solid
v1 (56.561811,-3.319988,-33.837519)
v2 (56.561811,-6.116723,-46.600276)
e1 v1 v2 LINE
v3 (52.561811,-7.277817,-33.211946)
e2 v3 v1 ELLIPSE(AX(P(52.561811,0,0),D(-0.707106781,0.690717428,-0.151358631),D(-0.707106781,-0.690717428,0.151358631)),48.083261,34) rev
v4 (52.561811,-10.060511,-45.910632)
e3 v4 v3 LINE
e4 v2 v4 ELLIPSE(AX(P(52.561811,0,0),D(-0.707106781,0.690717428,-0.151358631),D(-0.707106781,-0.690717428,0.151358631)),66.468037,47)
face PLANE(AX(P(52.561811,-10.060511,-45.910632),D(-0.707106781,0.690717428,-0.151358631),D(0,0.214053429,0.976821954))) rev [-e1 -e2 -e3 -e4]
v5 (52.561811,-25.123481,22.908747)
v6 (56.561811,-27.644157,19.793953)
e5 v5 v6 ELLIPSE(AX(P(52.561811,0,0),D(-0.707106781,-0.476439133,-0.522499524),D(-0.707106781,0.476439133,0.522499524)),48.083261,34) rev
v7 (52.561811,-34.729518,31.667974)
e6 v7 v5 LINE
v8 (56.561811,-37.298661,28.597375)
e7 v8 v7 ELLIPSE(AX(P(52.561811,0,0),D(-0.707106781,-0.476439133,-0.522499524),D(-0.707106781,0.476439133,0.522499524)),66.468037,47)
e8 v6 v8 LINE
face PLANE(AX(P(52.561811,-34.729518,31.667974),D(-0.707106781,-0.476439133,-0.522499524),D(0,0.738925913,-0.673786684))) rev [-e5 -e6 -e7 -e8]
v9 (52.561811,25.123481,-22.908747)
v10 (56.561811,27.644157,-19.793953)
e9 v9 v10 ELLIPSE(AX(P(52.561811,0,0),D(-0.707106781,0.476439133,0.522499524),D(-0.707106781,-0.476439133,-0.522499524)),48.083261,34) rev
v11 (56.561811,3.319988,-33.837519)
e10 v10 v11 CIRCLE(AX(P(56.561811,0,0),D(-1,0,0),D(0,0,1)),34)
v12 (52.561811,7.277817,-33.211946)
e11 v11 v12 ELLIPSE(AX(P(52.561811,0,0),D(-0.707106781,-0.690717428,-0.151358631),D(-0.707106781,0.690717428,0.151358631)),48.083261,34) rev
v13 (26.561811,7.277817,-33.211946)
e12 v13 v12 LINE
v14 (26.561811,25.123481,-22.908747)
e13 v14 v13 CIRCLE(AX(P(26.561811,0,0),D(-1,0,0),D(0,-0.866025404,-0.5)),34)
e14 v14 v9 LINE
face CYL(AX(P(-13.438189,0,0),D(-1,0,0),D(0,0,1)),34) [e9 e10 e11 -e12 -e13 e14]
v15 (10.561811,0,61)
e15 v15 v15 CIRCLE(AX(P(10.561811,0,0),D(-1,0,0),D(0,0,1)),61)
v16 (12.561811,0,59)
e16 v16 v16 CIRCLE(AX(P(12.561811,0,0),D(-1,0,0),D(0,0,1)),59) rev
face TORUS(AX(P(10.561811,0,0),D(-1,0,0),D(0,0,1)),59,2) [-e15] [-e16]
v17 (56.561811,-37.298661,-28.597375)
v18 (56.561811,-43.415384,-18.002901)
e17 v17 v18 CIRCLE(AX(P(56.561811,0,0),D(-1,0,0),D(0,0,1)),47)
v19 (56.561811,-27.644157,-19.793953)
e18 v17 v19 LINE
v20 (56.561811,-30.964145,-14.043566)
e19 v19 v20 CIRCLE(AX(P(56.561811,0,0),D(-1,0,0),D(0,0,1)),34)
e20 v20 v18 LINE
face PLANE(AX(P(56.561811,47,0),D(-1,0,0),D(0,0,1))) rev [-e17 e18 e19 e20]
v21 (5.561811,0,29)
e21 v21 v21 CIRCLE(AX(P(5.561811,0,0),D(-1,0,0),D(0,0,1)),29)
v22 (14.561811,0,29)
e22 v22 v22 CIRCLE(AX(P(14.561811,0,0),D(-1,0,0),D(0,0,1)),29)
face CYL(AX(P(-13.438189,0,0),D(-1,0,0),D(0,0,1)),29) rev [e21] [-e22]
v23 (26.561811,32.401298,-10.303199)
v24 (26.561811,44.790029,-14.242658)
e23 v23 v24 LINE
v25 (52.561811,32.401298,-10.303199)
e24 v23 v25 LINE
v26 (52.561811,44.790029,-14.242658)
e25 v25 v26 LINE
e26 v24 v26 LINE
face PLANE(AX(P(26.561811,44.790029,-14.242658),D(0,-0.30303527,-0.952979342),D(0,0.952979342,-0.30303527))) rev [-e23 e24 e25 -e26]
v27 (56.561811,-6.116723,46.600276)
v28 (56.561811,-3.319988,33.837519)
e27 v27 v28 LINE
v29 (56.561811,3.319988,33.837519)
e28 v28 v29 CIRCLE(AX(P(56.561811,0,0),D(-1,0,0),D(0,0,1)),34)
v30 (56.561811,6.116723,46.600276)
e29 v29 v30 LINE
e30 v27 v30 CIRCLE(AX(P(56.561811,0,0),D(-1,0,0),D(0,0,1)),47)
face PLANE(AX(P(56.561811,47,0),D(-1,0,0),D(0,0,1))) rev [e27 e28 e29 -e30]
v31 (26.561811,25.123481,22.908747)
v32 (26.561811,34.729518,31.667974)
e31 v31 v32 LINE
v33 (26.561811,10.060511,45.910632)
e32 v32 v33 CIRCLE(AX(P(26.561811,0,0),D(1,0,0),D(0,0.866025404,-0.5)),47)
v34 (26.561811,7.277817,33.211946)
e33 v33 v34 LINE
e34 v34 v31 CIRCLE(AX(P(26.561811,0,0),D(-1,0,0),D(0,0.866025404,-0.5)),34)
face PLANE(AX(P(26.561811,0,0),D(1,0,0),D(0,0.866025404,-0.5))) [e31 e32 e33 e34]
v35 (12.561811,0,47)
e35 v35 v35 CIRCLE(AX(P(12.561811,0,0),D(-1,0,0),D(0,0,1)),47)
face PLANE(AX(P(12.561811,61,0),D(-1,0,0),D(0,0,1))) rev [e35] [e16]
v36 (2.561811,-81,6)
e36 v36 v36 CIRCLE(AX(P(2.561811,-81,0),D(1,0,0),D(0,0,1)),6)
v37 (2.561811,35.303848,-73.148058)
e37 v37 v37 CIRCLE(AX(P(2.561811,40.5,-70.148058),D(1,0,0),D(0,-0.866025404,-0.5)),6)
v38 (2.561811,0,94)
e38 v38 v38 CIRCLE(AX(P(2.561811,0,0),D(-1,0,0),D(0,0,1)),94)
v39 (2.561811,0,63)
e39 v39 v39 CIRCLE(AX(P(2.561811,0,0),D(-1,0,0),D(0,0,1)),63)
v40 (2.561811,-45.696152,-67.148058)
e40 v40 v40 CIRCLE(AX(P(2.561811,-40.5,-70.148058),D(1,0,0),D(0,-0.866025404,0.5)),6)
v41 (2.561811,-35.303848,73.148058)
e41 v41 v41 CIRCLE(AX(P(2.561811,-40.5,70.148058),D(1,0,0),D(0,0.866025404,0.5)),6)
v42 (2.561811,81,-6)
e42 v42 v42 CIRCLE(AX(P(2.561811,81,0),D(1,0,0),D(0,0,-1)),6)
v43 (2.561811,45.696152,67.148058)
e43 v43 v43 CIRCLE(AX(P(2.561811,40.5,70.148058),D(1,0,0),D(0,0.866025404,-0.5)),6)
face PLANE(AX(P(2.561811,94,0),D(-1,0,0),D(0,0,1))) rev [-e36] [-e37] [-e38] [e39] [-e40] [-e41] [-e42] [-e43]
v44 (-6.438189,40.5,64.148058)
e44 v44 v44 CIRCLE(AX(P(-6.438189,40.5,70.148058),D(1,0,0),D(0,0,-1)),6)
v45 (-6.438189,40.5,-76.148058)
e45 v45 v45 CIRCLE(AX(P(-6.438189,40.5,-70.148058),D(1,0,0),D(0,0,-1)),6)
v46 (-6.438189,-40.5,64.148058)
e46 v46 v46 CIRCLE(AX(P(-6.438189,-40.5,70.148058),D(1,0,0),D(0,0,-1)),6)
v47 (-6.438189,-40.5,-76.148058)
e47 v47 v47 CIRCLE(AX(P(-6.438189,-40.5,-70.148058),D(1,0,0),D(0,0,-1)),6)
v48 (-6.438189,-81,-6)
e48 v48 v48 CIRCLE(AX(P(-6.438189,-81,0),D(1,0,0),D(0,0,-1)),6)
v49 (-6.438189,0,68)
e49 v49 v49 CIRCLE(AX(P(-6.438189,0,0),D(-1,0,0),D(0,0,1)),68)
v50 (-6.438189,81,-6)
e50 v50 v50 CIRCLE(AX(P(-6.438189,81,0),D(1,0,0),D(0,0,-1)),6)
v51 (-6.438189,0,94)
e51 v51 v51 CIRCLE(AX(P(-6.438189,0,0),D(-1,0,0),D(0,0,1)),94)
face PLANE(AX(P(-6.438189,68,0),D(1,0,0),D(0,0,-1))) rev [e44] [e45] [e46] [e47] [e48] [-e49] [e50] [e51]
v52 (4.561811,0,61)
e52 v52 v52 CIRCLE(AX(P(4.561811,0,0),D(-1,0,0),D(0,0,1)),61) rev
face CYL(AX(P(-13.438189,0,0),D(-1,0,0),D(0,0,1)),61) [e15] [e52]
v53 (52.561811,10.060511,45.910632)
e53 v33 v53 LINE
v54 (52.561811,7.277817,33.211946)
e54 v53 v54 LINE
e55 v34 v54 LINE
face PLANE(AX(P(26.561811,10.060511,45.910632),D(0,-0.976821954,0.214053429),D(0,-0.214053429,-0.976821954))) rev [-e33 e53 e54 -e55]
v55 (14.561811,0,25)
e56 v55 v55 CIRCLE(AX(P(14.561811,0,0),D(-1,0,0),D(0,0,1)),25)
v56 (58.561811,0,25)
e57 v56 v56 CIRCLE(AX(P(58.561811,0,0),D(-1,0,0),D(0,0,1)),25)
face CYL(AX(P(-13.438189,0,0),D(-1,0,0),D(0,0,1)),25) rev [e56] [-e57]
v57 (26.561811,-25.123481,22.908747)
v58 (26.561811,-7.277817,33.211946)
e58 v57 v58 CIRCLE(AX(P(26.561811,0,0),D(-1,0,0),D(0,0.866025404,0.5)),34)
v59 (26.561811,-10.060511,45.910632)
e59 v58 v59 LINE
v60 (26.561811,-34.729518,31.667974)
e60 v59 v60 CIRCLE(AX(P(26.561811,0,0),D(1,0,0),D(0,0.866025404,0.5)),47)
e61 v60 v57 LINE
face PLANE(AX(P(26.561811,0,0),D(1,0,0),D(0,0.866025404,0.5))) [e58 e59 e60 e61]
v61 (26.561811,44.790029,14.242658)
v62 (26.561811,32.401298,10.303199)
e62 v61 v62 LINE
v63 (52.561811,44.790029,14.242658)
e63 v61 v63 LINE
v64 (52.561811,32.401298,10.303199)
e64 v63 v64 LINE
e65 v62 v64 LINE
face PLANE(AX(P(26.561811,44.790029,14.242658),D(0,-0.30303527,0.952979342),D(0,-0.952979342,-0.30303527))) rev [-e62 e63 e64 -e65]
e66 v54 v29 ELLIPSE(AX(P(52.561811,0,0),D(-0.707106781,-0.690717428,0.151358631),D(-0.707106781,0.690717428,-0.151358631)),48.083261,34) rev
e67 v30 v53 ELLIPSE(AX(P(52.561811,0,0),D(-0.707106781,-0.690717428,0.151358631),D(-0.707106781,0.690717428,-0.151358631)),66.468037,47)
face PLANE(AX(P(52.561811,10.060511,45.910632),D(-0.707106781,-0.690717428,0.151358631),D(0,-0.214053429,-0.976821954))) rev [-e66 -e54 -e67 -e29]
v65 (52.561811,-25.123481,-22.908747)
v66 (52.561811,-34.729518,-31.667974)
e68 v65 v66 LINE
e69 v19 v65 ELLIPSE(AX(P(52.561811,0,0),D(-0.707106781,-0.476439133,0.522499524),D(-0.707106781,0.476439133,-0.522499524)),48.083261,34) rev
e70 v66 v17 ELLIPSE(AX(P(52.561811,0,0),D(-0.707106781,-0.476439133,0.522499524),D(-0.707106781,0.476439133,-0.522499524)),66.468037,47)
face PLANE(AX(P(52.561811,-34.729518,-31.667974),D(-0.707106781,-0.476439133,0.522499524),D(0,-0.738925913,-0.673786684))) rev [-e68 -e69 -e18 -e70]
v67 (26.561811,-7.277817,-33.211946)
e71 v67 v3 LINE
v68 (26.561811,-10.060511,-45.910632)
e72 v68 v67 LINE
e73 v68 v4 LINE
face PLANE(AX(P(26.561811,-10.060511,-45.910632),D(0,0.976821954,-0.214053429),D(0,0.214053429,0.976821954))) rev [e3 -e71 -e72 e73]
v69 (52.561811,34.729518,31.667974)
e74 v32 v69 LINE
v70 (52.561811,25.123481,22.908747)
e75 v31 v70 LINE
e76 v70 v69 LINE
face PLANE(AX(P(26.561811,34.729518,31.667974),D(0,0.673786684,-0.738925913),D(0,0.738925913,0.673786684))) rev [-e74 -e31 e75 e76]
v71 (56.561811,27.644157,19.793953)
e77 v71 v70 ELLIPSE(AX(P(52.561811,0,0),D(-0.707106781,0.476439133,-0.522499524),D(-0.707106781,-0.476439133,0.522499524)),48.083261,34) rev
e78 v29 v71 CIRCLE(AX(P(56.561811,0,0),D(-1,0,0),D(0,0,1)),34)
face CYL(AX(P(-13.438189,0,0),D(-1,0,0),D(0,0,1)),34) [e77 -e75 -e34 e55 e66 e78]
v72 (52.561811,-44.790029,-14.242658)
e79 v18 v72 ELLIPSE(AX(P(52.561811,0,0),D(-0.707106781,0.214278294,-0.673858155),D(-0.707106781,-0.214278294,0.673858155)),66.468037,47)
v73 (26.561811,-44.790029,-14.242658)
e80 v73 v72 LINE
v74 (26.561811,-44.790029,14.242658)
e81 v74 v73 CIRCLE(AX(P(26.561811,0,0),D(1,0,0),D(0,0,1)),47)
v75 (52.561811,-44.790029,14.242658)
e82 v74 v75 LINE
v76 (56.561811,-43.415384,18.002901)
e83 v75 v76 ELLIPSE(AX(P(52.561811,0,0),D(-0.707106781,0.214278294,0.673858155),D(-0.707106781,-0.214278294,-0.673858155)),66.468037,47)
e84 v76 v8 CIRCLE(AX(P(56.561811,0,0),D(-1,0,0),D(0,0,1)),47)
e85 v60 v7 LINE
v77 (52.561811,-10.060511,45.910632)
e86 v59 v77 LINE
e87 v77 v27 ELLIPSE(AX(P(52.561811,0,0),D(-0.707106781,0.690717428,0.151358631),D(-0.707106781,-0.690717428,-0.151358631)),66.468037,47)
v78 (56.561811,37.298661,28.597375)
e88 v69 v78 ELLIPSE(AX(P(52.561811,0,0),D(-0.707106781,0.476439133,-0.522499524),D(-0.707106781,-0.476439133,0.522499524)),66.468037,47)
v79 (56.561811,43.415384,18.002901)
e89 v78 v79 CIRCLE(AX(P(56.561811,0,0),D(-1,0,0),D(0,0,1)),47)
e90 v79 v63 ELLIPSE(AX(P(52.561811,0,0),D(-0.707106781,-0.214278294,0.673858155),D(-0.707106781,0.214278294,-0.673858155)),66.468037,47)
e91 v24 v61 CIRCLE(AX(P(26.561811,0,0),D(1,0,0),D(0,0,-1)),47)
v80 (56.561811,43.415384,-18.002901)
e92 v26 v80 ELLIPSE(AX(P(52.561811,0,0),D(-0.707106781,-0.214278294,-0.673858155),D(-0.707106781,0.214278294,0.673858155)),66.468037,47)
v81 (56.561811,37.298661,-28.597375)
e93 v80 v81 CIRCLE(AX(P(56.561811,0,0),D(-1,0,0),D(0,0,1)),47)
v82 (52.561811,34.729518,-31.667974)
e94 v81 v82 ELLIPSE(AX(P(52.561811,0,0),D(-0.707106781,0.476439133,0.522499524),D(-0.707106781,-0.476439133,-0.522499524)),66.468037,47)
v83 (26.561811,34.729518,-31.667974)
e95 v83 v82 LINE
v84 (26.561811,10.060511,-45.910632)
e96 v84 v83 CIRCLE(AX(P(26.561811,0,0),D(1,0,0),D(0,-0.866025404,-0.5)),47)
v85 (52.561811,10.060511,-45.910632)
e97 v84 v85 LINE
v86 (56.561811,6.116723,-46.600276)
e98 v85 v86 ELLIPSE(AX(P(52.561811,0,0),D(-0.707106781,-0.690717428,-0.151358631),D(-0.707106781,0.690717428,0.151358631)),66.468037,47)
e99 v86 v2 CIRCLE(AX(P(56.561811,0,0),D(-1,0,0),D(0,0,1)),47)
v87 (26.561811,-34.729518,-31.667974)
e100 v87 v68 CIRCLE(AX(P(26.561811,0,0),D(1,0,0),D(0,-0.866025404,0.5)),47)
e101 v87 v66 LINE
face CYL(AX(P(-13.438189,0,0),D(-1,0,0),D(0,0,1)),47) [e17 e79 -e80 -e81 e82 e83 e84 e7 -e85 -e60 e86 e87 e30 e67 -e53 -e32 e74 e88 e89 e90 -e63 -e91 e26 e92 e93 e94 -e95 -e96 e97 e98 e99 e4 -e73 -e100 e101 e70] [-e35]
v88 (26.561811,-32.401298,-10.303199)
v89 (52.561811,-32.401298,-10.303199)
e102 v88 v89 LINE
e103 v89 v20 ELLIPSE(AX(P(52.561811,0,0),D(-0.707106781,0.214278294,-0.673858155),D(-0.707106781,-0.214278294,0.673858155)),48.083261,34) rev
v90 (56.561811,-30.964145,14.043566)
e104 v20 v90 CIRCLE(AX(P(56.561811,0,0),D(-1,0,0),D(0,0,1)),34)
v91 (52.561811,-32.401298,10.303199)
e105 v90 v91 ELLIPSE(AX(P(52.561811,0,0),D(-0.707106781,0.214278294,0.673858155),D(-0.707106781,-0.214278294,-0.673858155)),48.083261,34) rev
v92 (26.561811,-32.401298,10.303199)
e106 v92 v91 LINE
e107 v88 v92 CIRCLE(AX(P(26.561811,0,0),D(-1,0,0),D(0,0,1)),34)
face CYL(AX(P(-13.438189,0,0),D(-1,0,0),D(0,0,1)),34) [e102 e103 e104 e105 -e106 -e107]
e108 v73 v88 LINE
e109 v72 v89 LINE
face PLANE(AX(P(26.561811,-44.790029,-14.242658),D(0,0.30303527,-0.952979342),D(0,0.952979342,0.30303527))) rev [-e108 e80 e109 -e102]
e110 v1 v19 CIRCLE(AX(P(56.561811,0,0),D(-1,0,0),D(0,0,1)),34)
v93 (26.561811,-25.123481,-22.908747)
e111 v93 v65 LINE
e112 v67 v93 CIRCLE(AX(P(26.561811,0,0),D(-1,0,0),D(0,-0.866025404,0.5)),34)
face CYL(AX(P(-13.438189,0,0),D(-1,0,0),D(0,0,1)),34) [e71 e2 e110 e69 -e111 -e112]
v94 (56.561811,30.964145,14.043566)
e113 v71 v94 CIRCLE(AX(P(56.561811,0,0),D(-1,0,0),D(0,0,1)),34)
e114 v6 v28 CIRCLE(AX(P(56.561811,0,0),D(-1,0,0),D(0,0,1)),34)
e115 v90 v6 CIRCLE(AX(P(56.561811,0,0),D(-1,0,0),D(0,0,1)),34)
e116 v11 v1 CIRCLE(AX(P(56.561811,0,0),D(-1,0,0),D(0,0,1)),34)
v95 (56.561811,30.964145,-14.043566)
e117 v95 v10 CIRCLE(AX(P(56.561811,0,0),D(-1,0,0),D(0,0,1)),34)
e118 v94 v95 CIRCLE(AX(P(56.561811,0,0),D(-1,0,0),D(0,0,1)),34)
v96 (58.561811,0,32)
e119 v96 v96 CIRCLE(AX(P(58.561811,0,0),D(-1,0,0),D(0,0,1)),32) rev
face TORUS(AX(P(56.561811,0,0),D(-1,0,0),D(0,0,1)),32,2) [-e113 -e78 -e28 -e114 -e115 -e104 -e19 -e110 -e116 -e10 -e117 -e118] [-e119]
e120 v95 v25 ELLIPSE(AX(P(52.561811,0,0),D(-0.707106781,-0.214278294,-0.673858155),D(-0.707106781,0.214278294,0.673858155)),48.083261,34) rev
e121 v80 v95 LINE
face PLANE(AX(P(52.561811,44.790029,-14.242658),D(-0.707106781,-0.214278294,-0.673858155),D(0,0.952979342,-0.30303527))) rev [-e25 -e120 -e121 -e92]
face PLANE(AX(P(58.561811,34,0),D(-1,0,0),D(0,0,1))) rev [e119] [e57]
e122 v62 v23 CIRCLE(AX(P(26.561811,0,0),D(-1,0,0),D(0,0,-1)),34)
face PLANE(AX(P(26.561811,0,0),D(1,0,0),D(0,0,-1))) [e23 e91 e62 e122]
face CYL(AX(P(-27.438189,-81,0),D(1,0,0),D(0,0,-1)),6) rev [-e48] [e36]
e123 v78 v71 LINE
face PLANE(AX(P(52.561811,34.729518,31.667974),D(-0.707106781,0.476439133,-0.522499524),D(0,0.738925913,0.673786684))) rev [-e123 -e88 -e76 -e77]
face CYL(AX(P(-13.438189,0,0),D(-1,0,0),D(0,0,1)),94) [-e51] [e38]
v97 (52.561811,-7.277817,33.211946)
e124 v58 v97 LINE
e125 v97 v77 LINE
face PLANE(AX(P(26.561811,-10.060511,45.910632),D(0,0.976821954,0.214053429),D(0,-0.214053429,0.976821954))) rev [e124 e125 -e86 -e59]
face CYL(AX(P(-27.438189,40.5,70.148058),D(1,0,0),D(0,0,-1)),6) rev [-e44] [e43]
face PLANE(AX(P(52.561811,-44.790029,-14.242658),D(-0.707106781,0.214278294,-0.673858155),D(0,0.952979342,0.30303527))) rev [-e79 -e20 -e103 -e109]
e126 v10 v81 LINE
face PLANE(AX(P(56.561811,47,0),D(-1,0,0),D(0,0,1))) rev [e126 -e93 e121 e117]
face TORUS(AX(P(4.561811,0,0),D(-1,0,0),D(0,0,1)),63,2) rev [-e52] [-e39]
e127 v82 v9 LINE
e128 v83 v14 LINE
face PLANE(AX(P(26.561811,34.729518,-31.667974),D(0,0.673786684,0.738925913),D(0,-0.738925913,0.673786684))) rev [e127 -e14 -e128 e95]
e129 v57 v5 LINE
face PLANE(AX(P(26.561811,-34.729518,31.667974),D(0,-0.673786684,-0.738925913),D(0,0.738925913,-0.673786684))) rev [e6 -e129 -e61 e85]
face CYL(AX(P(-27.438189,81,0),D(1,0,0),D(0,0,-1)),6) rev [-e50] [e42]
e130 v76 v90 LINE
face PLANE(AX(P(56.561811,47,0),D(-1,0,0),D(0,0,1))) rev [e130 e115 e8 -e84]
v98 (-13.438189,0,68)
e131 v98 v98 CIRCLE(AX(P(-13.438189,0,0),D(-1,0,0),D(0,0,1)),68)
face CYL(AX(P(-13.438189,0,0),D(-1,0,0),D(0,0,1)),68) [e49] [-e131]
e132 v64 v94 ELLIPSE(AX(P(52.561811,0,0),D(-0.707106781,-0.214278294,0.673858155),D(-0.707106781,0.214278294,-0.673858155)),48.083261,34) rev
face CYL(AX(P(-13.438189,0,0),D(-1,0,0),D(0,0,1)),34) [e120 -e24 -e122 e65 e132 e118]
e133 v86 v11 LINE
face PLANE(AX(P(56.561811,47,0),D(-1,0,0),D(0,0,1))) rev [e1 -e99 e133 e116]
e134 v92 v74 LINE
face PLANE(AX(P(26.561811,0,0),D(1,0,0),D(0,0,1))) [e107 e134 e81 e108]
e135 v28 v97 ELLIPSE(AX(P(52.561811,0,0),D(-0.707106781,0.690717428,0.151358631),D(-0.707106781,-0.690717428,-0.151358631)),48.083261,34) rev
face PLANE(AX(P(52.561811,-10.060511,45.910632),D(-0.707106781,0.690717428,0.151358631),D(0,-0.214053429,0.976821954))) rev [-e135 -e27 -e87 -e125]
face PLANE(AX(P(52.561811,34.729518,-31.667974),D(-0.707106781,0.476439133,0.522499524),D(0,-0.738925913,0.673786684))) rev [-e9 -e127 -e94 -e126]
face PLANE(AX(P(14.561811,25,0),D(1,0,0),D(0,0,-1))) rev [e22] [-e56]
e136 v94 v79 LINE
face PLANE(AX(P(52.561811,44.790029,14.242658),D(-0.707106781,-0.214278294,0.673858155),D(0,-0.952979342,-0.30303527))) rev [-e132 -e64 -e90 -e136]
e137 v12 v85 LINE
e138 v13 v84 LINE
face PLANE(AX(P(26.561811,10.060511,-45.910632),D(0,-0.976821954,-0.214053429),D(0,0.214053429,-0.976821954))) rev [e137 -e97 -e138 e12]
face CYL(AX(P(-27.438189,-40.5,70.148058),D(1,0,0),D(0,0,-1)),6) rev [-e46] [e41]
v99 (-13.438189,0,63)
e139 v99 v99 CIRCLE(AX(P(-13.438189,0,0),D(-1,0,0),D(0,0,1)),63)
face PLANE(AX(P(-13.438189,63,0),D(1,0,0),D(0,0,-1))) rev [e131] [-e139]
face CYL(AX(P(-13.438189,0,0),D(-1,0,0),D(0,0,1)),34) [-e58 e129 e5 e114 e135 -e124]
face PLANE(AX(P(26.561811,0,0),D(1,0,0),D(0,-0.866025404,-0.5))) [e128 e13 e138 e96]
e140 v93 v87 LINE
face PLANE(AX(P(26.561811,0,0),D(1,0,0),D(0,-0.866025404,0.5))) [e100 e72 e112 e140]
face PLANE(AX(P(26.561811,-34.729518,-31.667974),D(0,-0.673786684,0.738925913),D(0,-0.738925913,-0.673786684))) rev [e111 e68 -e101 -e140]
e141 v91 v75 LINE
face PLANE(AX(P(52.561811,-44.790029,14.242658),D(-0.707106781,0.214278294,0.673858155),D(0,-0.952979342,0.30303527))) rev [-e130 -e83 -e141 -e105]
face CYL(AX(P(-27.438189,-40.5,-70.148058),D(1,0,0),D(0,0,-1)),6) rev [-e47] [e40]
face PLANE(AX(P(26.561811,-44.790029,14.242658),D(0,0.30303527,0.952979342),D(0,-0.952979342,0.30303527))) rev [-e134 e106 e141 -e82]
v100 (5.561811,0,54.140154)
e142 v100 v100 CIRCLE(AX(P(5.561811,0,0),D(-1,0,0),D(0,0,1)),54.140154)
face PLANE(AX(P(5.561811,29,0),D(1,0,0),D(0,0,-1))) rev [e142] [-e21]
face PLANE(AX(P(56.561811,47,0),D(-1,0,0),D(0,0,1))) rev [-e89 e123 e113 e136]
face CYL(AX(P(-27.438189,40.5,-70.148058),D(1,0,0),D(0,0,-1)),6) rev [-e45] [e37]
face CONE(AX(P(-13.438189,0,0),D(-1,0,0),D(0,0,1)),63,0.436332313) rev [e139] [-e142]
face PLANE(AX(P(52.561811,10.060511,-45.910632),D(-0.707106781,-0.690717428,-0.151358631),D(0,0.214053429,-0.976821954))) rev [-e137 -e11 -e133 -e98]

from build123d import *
from build123d.topology import SkipClean

# Parameters (mm, degrees)
CUT_EXTRUDE1_DEPTH = 15
SKETCH3_R          = 3.0000000000000018
CUT_EXTRUDE2_DEPTH = 15
CIRPATTERN2_COUNT  = 6
FILLET1_R          = 1
CHAMFER1_SIZE      = 2
SCALE1_SCALE       = 2


# Some blends are built 0.0001 mm under size
with BuildPart() as part:
    # Sketch1 → Revolve1 (revolve)
    with BuildSketch(Plane.XY, mode=Mode.PRIVATE) as revolve1_sk:
        Polygon((0, 31.5), (0, 34), (3.5, 34), (3.5, 47), (8, 47), (8.000000000000004, 30.499999999999993), (13.000000000000005, 30.499999999999993), (13.000000000000005, 23.499999999999996), (35, 23.49999999999999), (35, 17.000000000000004), (36.00000000000001, 17.000000000000007), (36.00000000000001, 12.500000000000007), (14.000000000000005, 12.5), (14.000000000000005, 14.5), (9.500000000000005, 14.500000000000002), (9.500000000000005, 27.07007724752754), align=None)
    revolve(revolve1_sk.sketch.rotate(Axis((0, 0, 0), (1, 0, 0)), 90), axis=Axis((0, 0, 0), (1, 0, 0)))

    # Sketch2 → Cut-Extrude1 (cut)
    with BuildSketch(Plane(origin=(35, 0, 0), x_dir=(0, 0, -1), z_dir=(1, 0, 0))):
        with BuildLine():
            Line((-7.121328836370207, 22.395014525654634), (-5.151599583757172, 16.200648805792717))
            ThreePointArc((-5.151599583757172, 16.200648805792717), (-6.51e-15, 17), (5.151599583757166, 16.200648805792717))
            Line((5.151599583757166, 16.200648805792717), (7.121328836370199, 22.395014525654634))
            ThreePointArc((7.121328836370199, 22.395014525654634), (-3.78e-15, 23.499999999999996), (-7.121328836370207, 22.395014525654634))
        make_face()
    cut_extrude1 = extrude(amount=-CUT_EXTRUDE1_DEPTH, mode=Mode.SUBTRACT)

    # Sketch3 → Cut-Extrude2 (cut)
    with BuildSketch(Plane(origin=(8.000000000000002, 0, 0), x_dir=(0, 0, -1), z_dir=(1, 0, 0))):
        with Locations((0, 40.5)):
            Circle(SKETCH3_R)
    cut_extrude2 = extrude(amount=-CUT_EXTRUDE2_DEPTH, mode=Mode.SUBTRACT)

    # CirPattern2: Cut-Extrude1, Cut-Extrude2 ×6 about axis
    with SkipClean():  # the faces are left unmerged after this step: merging them gives an invalid solid
        cirpattern2_axis = Axis((0, -8.4e-16, -2.024e-14), (1, 0, 0))
        add([cut_extrude1.rotate(cirpattern2_axis, i * 360 / CIRPATTERN2_COUNT) for i in range(1, CIRPATTERN2_COUNT)], mode=Mode.SUBTRACT)
        add([cut_extrude2.rotate(cirpattern2_axis, i * 360 / CIRPATTERN2_COUNT) for i in range(1, CIRPATTERN2_COUNT)], mode=Mode.SUBTRACT)

    # Fillet1
    fillet1_edges = [part.edges().sort_by_distance(p)[0] for p in [
        (36.00000000000001, -3.97e-15, -17.000000000000007),
        (13.000000000000005, -7.12e-15, -30.499999999999993),
        (8.000000000000004, -7.12e-15, -30.499999999999993),
    ]]
    fillet(fillet1_edges, radius=FILLET1_R - 0.0001)  # a hair under: the kernel refuses the full size

    # Chamfer1
    # the kernel refuses this chamfer: 2 mm, written as the material it takes off along each edge
    with BuildSketch(Plane(origin=(35, -8.761174115451754, -7.988842125078546), x_dir=(0.027495876610585633, -0.6735319368685933, 0.7386465371119375), z_dir=(0, -0.7389259125032596, -0.6737866842192901))) as chamfer1_piece_1_section:
        Polygon((CHAMFER1_SIZE * 0.999621916911, CHAMFER1_SIZE * 0.0274958766106), (-CHAMFER1_SIZE * 0.0274958766106, CHAMFER1_SIZE * 0.999621916911), (0, 0), align=None)
    chamfer1_piece_1 = extrude(amount=16.786731951863647, mode=Mode.PRIVATE)
    chamfer1_piece_1 = chamfer1_piece_1 - Plane(origin=(34.34095626935287, 0, 0), x_dir=(0, 1.1e-16, 1), z_dir=(1, 0, 0)) * Cylinder(17.000000000000004, 42, mode=Mode.PRIVATE)
    add(chamfer1_piece_1, mode=Mode.SUBTRACT)
    with BuildSketch(Plane(origin=(35, -6.131210705649978, -27.979468717509512), x_dir=(-0.9996219169112968, -0.026858575913627898, 0.005885586672240668), z_dir=(0, 0.21405342901395988, 0.9768219538520649))) as chamfer1_piece_2_section:
        Polygon((CHAMFER1_SIZE * 0.999621916911, -CHAMFER1_SIZE * 0.0274958766106), (-CHAMFER1_SIZE * 0.0274958766106, -CHAMFER1_SIZE * 0.999621916911), (0, 0), align=None)
    chamfer1_piece_2 = extrude(amount=16.786731951863644, mode=Mode.PRIVATE)
    chamfer1_piece_2 = chamfer1_piece_2 - Plane(origin=(34.34095626935968, 5.449e-14, 2.889e-14), x_dir=(0, -0.21405342901396118, -0.9768219538520647), z_dir=(1, 0, 0)) * Cylinder(17.00000000000007, 42, mode=Mode.PRIVATE)
    add(chamfer1_piece_2, mode=Mode.SUBTRACT)
    with BuildSketch(Plane(origin=(35, 2.537953169415396, -11.581820413499162), x_dir=(0.02749587661058563, -0.9764526339906394, -0.21397249903237056), z_dir=(0, 0.21405342901395968, -0.976821953852065))) as chamfer1_piece_3_section:
        Polygon((CHAMFER1_SIZE * 0.999621916911, CHAMFER1_SIZE * 0.0274958766106), (-CHAMFER1_SIZE * 0.0274958766106, CHAMFER1_SIZE * 0.999621916911), (0, 0), align=None)
    chamfer1_piece_3 = extrude(amount=16.786731951863636, mode=Mode.PRIVATE)
    chamfer1_piece_3 = chamfer1_piece_3 - Plane(origin=(34.34095626935361, 0, 0), x_dir=(0, 1.1e-16, 1), z_dir=(1, 0, 0)) * Cylinder(17.000000000000004, 42, mode=Mode.PRIVATE)
    add(chamfer1_piece_3, mode=Mode.SUBTRACT)
    with BuildSketch(Plane(origin=(35, 21.165325340930252, -19.299518585802748), x_dir=(-0.9996219169112968, -0.018526355531149796, -0.020317415714554633), z_dir=(0, -0.7389259125032593, 0.6737866842192902))) as chamfer1_piece_4_section:
        Polygon((CHAMFER1_SIZE * 0.999621916911, -CHAMFER1_SIZE * 0.0274958766106), (-CHAMFER1_SIZE * 0.0274958766106, -CHAMFER1_SIZE * 0.999621916911), (0, 0), align=None)
    chamfer1_piece_4 = extrude(amount=16.786731951863647, mode=Mode.PRIVATE)
    chamfer1_piece_4 = chamfer1_piece_4 - Plane(origin=(34.340956269359076, -1.572e-14, 5.224e-14), x_dir=(0, 0.7389259125032586, -0.6737866842192912), z_dir=(1, 0, 0)) * Cylinder(17.00000000000007, 42, mode=Mode.PRIVATE)
    add(chamfer1_piece_4, mode=Mode.SUBTRACT)
    with BuildSketch(Plane(origin=(35, 11.299127284867144, -3.592978288420628), x_dir=(0.027495876610585616, -0.3029206971220457, -0.9526190361443074), z_dir=(0, 0.9529793415172187, -0.30303526963277455))) as chamfer1_piece_5_section:
        Polygon((CHAMFER1_SIZE * 0.999621916911, CHAMFER1_SIZE * 0.0274958766106), (-CHAMFER1_SIZE * 0.0274958766106, CHAMFER1_SIZE * 0.999621916911), (0, 0), align=None)
    chamfer1_piece_5 = extrude(amount=16.78673195186364, mode=Mode.PRIVATE)
    chamfer1_piece_5 = chamfer1_piece_5 - Plane(origin=(34.340956269353335, 0, 0), x_dir=(0, 1.1e-16, 1), z_dir=(1, 0, 0)) * Cylinder(17.000000000000004, 42, mode=Mode.PRIVATE)
    add(chamfer1_piece_5, mode=Mode.SUBTRACT)
    with BuildSketch(Plane(origin=(35, 27.296536046580208, 8.679950131706747), x_dir=(-0.9996219169112968, 0.008332220382478566, -0.026203002386795352), z_dir=(0, -0.9529793415172185, -0.3030352696327747))) as chamfer1_piece_6_section:
        Polygon((CHAMFER1_SIZE * 0.999621916911, -CHAMFER1_SIZE * 0.0274958766106), (-CHAMFER1_SIZE * 0.0274958766106, -CHAMFER1_SIZE * 0.999621916911), (0, 0), align=None)
    chamfer1_piece_6 = extrude(amount=16.78673195186364, mode=Mode.PRIVATE)
    chamfer1_piece_6 = chamfer1_piece_6 - Plane(origin=(34.340956269359246, -7.105e-14, 3.11e-15), x_dir=(0, 0.9529793415172191, 0.3030352696327735), z_dir=(1, 0, 0)) * Cylinder(17.00000000000007, 42, mode=Mode.PRIVATE)
    add(chamfer1_piece_6, mode=Mode.SUBTRACT)
    with BuildSketch(Plane(origin=(35, 8.761174115451746, 7.988842125078507), x_dir=(0.027495876610585623, 0.6735319368685936, -0.738646537111937), z_dir=(0, 0.7389259125032592, 0.6737866842192906))) as chamfer1_piece_7_section:
        Polygon((CHAMFER1_SIZE * 0.999621916911, CHAMFER1_SIZE * 0.0274958766106), (-CHAMFER1_SIZE * 0.0274958766106, CHAMFER1_SIZE * 0.999621916911), (0, 0), align=None)
    chamfer1_piece_7 = extrude(amount=16.786731951863654, mode=Mode.PRIVATE)
    chamfer1_piece_7 = chamfer1_piece_7 - Plane(origin=(34.34095626935326, 0, 0), x_dir=(0, 1.1e-16, 1), z_dir=(1, 0, 0)) * Cylinder(17.000000000000004, 42, mode=Mode.PRIVATE)
    add(chamfer1_piece_7, mode=Mode.SUBTRACT)
    with BuildSketch(Plane(origin=(35, 6.131210705649962, 27.97946871750947), x_dir=(0.027495876610585616, -0.9764526339906394, 0.21397249903237028), z_dir=(0, -0.21405342901395943, -0.976821953852065))) as chamfer1_piece_8_section:
        Polygon((CHAMFER1_SIZE * 0.999621916911, CHAMFER1_SIZE * 0.0274958766106), (-CHAMFER1_SIZE * 0.0274958766106, CHAMFER1_SIZE * 0.999621916911), (0, 0), align=None)
    chamfer1_piece_8 = extrude(amount=16.786731951863636, mode=Mode.PRIVATE)
    chamfer1_piece_8 = chamfer1_piece_8 - Plane(origin=(34.34095626952976, 0, 0), x_dir=(0, 1.1e-16, 1), z_dir=(1, 0, 0)) * Cylinder(17.000000000000004, 42, mode=Mode.PRIVATE)
    add(chamfer1_piece_8, mode=Mode.SUBTRACT)
    with BuildSketch(Plane(origin=(35, -2.537953169415392, 11.581820413499123), x_dir=(0.027495876610585623, 0.9764526339906394, 0.21397249903237017), z_dir=(0, -0.2140534290139593, 0.976821953852065))) as chamfer1_piece_9_section:
        Polygon((CHAMFER1_SIZE * 0.999621916911, CHAMFER1_SIZE * 0.0274958766106), (-CHAMFER1_SIZE * 0.0274958766106, CHAMFER1_SIZE * 0.999621916911), (0, 0), align=None)
    chamfer1_piece_9 = extrude(amount=16.786731951863636, mode=Mode.PRIVATE)
    chamfer1_piece_9 = chamfer1_piece_9 - Plane(origin=(34.34095626935359, 0, 0), x_dir=(0, 1.1e-16, 1), z_dir=(1, 0, 0)) * Cylinder(17.000000000000004, 42, mode=Mode.PRIVATE)
    add(chamfer1_piece_9, mode=Mode.SUBTRACT)
    with BuildSketch(Plane(origin=(35, -21.165325340930245, 19.299518585802712), x_dir=(-0.9996219169112968, 0.018526355531149803, 0.020317415714554626), z_dir=(0, 0.7389259125032591, -0.6737866842192906))) as chamfer1_piece_10_section:
        Polygon((CHAMFER1_SIZE * 0.999621916911, -CHAMFER1_SIZE * 0.0274958766106), (-CHAMFER1_SIZE * 0.0274958766106, -CHAMFER1_SIZE * 0.999621916911), (0, 0), align=None)
    chamfer1_piece_10 = extrude(amount=16.786731951863633, mode=Mode.PRIVATE)
    chamfer1_piece_10 = chamfer1_piece_10 - Plane(origin=(34.34095626935918, 1.405e-14, -9.273e-14), x_dir=(0, -0.7389259125032583, 0.6737866842192916), z_dir=(1, 0, 0)) * Cylinder(17.00000000000007, 42, mode=Mode.PRIVATE)
    add(chamfer1_piece_10, mode=Mode.SUBTRACT)
    with BuildSketch(Plane(origin=(35, -11.299127284867144, 3.5929782884205888), x_dir=(0.027495876610585616, 0.30292069712204583, 0.9526190361443074), z_dir=(0, -0.9529793415172187, 0.30303526963277466))) as chamfer1_piece_11_section:
        Polygon((CHAMFER1_SIZE * 0.999621916911, CHAMFER1_SIZE * 0.0274958766106), (-CHAMFER1_SIZE * 0.0274958766106, CHAMFER1_SIZE * 0.999621916911), (0, 0), align=None)
    chamfer1_piece_11 = extrude(amount=16.78673195186364, mode=Mode.PRIVATE)
    chamfer1_piece_11 = chamfer1_piece_11 - Plane(origin=(34.34095626935327, 0, 0), x_dir=(0, 1.1e-16, 1), z_dir=(1, 0, 0)) * Cylinder(17.000000000000004, 42, mode=Mode.PRIVATE)
    add(chamfer1_piece_11, mode=Mode.SUBTRACT)
    with BuildSketch(Plane(origin=(35, -27.296536046580208, -8.679950131706784), x_dir=(-0.9996219169112968, -0.008332220382478562, 0.026203002386795352), z_dir=(0, 0.9529793415172186, 0.30303526963277466))) as chamfer1_piece_12_section:
        Polygon((CHAMFER1_SIZE * 0.999621916911, -CHAMFER1_SIZE * 0.0274958766106), (-CHAMFER1_SIZE * 0.0274958766106, -CHAMFER1_SIZE * 0.999621916911), (0, 0), align=None)
    chamfer1_piece_12 = extrude(amount=16.786731951863636, mode=Mode.PRIVATE)
    chamfer1_piece_12 = chamfer1_piece_12 - Plane(origin=(34.34095626935956, 6.938e-14, -4.359e-14), x_dir=(0, -0.9529793415172191, -0.3030352696327734), z_dir=(1, 0, 0)) * Cylinder(17.00000000000007, 42, mode=Mode.PRIVATE)
    add(chamfer1_piece_12, mode=Mode.SUBTRACT)


with BuildPart() as part_1:
    # Scale1: scaled about (13.438191471, 0, 0)
    add(part.part.scale(SCALE1_SCALE).moved(Location((-13.438191471, 0, 0))))


solid = part_1.part
